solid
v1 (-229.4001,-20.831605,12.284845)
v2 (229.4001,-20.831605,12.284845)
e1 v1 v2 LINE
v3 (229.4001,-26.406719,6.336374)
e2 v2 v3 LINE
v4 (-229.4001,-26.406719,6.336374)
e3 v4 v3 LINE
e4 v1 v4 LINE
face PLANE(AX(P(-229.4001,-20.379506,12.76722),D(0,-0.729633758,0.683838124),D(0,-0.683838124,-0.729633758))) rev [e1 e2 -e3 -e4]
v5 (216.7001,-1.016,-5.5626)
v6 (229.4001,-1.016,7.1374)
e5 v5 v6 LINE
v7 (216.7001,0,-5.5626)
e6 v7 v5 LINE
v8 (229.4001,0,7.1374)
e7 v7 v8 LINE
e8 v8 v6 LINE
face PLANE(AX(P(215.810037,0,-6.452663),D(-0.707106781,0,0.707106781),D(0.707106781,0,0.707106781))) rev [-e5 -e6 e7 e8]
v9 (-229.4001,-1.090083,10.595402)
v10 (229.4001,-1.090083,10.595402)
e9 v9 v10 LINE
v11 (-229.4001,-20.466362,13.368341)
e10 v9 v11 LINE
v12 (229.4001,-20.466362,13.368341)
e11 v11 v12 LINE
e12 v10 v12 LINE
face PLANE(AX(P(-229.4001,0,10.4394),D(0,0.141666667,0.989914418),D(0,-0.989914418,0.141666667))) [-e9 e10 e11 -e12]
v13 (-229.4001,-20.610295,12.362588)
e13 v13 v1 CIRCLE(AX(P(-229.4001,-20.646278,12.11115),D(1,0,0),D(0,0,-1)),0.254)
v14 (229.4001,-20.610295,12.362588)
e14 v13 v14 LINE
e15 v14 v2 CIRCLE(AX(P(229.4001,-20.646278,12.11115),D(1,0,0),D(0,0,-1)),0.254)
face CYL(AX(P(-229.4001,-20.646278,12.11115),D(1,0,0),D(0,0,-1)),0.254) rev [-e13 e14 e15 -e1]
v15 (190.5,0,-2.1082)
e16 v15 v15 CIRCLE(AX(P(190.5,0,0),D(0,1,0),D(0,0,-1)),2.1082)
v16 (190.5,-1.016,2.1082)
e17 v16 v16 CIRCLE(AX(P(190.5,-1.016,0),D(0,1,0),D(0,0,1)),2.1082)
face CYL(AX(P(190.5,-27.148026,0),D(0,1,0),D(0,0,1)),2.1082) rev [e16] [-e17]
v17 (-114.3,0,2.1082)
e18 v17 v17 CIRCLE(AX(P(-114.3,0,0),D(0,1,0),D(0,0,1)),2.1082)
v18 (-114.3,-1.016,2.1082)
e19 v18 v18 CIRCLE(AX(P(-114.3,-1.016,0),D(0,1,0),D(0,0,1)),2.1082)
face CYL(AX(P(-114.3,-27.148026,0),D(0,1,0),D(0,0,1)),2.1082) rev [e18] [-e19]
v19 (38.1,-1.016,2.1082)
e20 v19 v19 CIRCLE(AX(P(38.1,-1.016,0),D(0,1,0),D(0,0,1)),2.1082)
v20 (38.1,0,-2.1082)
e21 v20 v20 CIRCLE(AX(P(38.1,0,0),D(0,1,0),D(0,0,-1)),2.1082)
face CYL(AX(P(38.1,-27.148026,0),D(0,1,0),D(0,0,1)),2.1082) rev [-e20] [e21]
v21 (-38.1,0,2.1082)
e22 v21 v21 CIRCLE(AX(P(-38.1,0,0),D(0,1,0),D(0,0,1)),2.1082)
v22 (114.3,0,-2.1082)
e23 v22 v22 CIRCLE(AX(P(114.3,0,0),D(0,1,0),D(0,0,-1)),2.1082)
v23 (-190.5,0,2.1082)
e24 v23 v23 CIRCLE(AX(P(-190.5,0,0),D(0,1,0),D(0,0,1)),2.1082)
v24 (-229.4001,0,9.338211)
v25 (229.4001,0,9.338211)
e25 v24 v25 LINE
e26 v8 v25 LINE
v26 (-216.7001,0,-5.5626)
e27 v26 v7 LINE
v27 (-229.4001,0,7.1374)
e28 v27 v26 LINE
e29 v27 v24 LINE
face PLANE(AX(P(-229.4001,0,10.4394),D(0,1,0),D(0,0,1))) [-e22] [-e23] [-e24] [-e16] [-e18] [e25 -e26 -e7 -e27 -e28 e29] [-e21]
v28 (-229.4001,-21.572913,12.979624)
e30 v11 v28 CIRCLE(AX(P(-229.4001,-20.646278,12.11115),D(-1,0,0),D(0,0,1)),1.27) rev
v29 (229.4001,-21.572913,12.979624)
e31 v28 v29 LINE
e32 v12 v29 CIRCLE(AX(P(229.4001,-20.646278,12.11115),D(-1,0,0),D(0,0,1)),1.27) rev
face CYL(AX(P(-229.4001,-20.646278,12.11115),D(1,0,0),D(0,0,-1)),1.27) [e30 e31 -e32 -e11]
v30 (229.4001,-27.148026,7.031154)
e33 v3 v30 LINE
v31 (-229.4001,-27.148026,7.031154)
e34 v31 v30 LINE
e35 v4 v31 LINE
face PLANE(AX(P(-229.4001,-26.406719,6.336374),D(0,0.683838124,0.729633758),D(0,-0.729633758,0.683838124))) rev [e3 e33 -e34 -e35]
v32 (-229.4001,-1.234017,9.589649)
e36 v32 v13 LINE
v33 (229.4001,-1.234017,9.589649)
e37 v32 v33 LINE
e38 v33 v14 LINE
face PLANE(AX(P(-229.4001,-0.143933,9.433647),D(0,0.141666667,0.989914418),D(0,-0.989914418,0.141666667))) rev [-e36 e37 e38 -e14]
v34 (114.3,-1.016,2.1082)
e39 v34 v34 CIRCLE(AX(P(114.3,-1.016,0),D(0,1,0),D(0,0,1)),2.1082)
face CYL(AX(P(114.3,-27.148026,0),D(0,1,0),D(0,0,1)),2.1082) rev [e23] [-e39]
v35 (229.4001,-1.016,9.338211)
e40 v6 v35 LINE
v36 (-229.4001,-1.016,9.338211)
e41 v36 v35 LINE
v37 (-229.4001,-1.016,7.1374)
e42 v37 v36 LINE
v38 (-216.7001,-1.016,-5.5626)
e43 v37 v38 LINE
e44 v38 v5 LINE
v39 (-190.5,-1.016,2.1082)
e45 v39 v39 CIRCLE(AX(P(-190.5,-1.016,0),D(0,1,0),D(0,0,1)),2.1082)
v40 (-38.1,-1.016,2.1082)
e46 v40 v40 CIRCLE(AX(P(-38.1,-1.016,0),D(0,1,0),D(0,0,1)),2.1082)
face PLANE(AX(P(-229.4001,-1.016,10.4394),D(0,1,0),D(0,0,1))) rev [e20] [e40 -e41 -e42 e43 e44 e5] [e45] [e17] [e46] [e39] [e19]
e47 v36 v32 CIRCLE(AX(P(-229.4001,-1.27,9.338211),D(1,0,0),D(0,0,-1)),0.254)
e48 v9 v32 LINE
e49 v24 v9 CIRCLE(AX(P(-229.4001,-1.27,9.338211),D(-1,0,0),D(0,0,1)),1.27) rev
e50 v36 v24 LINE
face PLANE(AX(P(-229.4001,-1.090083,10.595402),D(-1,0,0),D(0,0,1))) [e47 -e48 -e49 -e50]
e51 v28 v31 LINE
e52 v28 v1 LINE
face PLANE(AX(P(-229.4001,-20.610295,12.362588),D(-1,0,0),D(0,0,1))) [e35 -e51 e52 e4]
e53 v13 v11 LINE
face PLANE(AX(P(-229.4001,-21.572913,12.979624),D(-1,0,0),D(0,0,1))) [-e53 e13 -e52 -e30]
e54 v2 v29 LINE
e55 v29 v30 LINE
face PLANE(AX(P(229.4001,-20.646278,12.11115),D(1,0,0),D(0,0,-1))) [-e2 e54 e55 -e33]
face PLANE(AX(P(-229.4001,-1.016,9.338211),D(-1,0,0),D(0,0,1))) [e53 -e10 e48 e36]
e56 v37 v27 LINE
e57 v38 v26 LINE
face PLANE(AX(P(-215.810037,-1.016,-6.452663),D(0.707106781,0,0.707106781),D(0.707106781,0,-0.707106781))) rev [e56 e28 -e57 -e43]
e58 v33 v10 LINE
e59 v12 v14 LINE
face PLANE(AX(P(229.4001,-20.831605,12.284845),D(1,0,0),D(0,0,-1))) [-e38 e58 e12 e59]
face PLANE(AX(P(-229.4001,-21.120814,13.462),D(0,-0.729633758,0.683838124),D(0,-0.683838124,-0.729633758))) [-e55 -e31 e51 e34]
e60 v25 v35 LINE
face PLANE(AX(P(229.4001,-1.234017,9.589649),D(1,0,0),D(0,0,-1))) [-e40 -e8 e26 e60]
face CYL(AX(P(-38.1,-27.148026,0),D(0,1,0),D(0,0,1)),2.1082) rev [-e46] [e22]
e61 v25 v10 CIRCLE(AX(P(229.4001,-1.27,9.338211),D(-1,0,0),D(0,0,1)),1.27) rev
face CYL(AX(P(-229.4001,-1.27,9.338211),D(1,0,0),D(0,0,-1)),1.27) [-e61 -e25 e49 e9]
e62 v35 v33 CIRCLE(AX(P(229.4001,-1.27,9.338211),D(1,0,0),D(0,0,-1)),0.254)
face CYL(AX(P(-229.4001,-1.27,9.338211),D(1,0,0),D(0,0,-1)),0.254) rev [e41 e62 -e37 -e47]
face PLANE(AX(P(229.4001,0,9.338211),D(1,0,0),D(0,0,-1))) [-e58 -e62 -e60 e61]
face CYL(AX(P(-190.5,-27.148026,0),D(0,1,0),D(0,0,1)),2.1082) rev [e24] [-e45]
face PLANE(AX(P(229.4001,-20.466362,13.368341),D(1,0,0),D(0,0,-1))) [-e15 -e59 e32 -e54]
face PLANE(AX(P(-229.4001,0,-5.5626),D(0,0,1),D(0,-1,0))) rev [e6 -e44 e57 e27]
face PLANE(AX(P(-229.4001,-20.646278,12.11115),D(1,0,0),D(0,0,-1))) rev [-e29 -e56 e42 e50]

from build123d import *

# Parameters (mm, degrees)
BASE_FLANGE1_START = -229.4001
BASE_FLANGE1_DEPTH = 458.8002
SKETCH3_R          = 2.1082
CUT_EXTRUDE1_DEPTH = 232.388150944
CUT_EXTRUDE2_DEPTH = 1.016


# Read off the part's stored shape, not the designer's step: Base-Flange1
with BuildPart() as part:
    # Base-Flange1 outline → Base-Flange1 (new body)
    with BuildSketch(Plane(origin=(0, 0, 0), x_dir=(0, 0, -1), z_dir=(1, 0, 0)).offset(BASE_FLANGE1_START)):
        with BuildLine():
            ThreePointArc((-13.368341311, -20.466361656), (-13.309368584, -21.067196635), (-12.979624418, -21.572913195))
            Line((-12.979624418, -21.572913195), (-7.031153987, -27.148026486))
            Line((-7.031153987, -27.148026486), (-6.336374453, -26.406718588))
            Line((-6.336374453, -26.406718588), (-12.284844884, -20.831605297))
            ThreePointArc((-12.284844884, -20.831605297), (-12.350793717, -20.730461985), (-12.362588262, -20.610294989))
            Line((-12.362588262, -20.610294989), (-9.589648793, -1.234016667))
            ThreePointArc((-9.589648793, -1.234016667), (-9.504607996, -1.078094077), (-9.33821053, -1.016))
            Line((-9.33821053, -1.016), (5.5626, -1.016))
            Line((5.5626, -1.016), (5.5626, 0))
            Line((5.5626, 0), (-9.33821053, 0))
            ThreePointArc((-9.33821053, 0), (-10.17019786, -0.310470384), (-10.595401842, -1.090083333))
            Line((-10.595401842, -1.090083333), (-13.368341311, -20.466361656))
        make_face()
    extrude(amount=BASE_FLANGE1_DEPTH)

    # Sketch3 → Cut-Extrude1 (cut, through all)
    with BuildSketch(Plane(origin=(0, 0, 0), x_dir=(1, 0, 0), z_dir=(0, 1, 0))):
        with Locations(Location((-38.1, 0, 0), (0, 0, 270))):
            Circle(SKETCH3_R)
        with Locations(Location((-114.3, 0, 0), (0, 0, 270))):
            Circle(SKETCH3_R)
        with Locations(Location((-190.5, 0, 0), (0, 0, 270))):
            Circle(SKETCH3_R)
        with Locations(Location((190.5, 0, 0), (0, 0, 270))):
            Circle(SKETCH3_R)
        with Locations(Location((114.3, 0, 0), (0, 0, 270))):
            Circle(SKETCH3_R)
        with Locations(Location((38.1, 0, 0), (0, 0, 270))):
            Circle(SKETCH3_R)
    extrude(amount=-CUT_EXTRUDE1_DEPTH, mode=Mode.SUBTRACT)

    # Sketch4 → Cut-Extrude2 (cut)
    with BuildSketch(Plane(origin=(0, 0, 0), x_dir=(1, 0, 0), z_dir=(0, 1, 0))):
        Polygon((-215.810037107, 6.452662893), (-235.374711333, -13.112011333), (-235.374711333, 6.452662893), align=None)
        Polygon((235.374711333, 6.452662893), (215.810037107, 6.452662893), (235.374711333, -13.112011333), align=None)
    extrude(amount=-CUT_EXTRUDE2_DEPTH, mode=Mode.SUBTRACT)


solid = part.part
